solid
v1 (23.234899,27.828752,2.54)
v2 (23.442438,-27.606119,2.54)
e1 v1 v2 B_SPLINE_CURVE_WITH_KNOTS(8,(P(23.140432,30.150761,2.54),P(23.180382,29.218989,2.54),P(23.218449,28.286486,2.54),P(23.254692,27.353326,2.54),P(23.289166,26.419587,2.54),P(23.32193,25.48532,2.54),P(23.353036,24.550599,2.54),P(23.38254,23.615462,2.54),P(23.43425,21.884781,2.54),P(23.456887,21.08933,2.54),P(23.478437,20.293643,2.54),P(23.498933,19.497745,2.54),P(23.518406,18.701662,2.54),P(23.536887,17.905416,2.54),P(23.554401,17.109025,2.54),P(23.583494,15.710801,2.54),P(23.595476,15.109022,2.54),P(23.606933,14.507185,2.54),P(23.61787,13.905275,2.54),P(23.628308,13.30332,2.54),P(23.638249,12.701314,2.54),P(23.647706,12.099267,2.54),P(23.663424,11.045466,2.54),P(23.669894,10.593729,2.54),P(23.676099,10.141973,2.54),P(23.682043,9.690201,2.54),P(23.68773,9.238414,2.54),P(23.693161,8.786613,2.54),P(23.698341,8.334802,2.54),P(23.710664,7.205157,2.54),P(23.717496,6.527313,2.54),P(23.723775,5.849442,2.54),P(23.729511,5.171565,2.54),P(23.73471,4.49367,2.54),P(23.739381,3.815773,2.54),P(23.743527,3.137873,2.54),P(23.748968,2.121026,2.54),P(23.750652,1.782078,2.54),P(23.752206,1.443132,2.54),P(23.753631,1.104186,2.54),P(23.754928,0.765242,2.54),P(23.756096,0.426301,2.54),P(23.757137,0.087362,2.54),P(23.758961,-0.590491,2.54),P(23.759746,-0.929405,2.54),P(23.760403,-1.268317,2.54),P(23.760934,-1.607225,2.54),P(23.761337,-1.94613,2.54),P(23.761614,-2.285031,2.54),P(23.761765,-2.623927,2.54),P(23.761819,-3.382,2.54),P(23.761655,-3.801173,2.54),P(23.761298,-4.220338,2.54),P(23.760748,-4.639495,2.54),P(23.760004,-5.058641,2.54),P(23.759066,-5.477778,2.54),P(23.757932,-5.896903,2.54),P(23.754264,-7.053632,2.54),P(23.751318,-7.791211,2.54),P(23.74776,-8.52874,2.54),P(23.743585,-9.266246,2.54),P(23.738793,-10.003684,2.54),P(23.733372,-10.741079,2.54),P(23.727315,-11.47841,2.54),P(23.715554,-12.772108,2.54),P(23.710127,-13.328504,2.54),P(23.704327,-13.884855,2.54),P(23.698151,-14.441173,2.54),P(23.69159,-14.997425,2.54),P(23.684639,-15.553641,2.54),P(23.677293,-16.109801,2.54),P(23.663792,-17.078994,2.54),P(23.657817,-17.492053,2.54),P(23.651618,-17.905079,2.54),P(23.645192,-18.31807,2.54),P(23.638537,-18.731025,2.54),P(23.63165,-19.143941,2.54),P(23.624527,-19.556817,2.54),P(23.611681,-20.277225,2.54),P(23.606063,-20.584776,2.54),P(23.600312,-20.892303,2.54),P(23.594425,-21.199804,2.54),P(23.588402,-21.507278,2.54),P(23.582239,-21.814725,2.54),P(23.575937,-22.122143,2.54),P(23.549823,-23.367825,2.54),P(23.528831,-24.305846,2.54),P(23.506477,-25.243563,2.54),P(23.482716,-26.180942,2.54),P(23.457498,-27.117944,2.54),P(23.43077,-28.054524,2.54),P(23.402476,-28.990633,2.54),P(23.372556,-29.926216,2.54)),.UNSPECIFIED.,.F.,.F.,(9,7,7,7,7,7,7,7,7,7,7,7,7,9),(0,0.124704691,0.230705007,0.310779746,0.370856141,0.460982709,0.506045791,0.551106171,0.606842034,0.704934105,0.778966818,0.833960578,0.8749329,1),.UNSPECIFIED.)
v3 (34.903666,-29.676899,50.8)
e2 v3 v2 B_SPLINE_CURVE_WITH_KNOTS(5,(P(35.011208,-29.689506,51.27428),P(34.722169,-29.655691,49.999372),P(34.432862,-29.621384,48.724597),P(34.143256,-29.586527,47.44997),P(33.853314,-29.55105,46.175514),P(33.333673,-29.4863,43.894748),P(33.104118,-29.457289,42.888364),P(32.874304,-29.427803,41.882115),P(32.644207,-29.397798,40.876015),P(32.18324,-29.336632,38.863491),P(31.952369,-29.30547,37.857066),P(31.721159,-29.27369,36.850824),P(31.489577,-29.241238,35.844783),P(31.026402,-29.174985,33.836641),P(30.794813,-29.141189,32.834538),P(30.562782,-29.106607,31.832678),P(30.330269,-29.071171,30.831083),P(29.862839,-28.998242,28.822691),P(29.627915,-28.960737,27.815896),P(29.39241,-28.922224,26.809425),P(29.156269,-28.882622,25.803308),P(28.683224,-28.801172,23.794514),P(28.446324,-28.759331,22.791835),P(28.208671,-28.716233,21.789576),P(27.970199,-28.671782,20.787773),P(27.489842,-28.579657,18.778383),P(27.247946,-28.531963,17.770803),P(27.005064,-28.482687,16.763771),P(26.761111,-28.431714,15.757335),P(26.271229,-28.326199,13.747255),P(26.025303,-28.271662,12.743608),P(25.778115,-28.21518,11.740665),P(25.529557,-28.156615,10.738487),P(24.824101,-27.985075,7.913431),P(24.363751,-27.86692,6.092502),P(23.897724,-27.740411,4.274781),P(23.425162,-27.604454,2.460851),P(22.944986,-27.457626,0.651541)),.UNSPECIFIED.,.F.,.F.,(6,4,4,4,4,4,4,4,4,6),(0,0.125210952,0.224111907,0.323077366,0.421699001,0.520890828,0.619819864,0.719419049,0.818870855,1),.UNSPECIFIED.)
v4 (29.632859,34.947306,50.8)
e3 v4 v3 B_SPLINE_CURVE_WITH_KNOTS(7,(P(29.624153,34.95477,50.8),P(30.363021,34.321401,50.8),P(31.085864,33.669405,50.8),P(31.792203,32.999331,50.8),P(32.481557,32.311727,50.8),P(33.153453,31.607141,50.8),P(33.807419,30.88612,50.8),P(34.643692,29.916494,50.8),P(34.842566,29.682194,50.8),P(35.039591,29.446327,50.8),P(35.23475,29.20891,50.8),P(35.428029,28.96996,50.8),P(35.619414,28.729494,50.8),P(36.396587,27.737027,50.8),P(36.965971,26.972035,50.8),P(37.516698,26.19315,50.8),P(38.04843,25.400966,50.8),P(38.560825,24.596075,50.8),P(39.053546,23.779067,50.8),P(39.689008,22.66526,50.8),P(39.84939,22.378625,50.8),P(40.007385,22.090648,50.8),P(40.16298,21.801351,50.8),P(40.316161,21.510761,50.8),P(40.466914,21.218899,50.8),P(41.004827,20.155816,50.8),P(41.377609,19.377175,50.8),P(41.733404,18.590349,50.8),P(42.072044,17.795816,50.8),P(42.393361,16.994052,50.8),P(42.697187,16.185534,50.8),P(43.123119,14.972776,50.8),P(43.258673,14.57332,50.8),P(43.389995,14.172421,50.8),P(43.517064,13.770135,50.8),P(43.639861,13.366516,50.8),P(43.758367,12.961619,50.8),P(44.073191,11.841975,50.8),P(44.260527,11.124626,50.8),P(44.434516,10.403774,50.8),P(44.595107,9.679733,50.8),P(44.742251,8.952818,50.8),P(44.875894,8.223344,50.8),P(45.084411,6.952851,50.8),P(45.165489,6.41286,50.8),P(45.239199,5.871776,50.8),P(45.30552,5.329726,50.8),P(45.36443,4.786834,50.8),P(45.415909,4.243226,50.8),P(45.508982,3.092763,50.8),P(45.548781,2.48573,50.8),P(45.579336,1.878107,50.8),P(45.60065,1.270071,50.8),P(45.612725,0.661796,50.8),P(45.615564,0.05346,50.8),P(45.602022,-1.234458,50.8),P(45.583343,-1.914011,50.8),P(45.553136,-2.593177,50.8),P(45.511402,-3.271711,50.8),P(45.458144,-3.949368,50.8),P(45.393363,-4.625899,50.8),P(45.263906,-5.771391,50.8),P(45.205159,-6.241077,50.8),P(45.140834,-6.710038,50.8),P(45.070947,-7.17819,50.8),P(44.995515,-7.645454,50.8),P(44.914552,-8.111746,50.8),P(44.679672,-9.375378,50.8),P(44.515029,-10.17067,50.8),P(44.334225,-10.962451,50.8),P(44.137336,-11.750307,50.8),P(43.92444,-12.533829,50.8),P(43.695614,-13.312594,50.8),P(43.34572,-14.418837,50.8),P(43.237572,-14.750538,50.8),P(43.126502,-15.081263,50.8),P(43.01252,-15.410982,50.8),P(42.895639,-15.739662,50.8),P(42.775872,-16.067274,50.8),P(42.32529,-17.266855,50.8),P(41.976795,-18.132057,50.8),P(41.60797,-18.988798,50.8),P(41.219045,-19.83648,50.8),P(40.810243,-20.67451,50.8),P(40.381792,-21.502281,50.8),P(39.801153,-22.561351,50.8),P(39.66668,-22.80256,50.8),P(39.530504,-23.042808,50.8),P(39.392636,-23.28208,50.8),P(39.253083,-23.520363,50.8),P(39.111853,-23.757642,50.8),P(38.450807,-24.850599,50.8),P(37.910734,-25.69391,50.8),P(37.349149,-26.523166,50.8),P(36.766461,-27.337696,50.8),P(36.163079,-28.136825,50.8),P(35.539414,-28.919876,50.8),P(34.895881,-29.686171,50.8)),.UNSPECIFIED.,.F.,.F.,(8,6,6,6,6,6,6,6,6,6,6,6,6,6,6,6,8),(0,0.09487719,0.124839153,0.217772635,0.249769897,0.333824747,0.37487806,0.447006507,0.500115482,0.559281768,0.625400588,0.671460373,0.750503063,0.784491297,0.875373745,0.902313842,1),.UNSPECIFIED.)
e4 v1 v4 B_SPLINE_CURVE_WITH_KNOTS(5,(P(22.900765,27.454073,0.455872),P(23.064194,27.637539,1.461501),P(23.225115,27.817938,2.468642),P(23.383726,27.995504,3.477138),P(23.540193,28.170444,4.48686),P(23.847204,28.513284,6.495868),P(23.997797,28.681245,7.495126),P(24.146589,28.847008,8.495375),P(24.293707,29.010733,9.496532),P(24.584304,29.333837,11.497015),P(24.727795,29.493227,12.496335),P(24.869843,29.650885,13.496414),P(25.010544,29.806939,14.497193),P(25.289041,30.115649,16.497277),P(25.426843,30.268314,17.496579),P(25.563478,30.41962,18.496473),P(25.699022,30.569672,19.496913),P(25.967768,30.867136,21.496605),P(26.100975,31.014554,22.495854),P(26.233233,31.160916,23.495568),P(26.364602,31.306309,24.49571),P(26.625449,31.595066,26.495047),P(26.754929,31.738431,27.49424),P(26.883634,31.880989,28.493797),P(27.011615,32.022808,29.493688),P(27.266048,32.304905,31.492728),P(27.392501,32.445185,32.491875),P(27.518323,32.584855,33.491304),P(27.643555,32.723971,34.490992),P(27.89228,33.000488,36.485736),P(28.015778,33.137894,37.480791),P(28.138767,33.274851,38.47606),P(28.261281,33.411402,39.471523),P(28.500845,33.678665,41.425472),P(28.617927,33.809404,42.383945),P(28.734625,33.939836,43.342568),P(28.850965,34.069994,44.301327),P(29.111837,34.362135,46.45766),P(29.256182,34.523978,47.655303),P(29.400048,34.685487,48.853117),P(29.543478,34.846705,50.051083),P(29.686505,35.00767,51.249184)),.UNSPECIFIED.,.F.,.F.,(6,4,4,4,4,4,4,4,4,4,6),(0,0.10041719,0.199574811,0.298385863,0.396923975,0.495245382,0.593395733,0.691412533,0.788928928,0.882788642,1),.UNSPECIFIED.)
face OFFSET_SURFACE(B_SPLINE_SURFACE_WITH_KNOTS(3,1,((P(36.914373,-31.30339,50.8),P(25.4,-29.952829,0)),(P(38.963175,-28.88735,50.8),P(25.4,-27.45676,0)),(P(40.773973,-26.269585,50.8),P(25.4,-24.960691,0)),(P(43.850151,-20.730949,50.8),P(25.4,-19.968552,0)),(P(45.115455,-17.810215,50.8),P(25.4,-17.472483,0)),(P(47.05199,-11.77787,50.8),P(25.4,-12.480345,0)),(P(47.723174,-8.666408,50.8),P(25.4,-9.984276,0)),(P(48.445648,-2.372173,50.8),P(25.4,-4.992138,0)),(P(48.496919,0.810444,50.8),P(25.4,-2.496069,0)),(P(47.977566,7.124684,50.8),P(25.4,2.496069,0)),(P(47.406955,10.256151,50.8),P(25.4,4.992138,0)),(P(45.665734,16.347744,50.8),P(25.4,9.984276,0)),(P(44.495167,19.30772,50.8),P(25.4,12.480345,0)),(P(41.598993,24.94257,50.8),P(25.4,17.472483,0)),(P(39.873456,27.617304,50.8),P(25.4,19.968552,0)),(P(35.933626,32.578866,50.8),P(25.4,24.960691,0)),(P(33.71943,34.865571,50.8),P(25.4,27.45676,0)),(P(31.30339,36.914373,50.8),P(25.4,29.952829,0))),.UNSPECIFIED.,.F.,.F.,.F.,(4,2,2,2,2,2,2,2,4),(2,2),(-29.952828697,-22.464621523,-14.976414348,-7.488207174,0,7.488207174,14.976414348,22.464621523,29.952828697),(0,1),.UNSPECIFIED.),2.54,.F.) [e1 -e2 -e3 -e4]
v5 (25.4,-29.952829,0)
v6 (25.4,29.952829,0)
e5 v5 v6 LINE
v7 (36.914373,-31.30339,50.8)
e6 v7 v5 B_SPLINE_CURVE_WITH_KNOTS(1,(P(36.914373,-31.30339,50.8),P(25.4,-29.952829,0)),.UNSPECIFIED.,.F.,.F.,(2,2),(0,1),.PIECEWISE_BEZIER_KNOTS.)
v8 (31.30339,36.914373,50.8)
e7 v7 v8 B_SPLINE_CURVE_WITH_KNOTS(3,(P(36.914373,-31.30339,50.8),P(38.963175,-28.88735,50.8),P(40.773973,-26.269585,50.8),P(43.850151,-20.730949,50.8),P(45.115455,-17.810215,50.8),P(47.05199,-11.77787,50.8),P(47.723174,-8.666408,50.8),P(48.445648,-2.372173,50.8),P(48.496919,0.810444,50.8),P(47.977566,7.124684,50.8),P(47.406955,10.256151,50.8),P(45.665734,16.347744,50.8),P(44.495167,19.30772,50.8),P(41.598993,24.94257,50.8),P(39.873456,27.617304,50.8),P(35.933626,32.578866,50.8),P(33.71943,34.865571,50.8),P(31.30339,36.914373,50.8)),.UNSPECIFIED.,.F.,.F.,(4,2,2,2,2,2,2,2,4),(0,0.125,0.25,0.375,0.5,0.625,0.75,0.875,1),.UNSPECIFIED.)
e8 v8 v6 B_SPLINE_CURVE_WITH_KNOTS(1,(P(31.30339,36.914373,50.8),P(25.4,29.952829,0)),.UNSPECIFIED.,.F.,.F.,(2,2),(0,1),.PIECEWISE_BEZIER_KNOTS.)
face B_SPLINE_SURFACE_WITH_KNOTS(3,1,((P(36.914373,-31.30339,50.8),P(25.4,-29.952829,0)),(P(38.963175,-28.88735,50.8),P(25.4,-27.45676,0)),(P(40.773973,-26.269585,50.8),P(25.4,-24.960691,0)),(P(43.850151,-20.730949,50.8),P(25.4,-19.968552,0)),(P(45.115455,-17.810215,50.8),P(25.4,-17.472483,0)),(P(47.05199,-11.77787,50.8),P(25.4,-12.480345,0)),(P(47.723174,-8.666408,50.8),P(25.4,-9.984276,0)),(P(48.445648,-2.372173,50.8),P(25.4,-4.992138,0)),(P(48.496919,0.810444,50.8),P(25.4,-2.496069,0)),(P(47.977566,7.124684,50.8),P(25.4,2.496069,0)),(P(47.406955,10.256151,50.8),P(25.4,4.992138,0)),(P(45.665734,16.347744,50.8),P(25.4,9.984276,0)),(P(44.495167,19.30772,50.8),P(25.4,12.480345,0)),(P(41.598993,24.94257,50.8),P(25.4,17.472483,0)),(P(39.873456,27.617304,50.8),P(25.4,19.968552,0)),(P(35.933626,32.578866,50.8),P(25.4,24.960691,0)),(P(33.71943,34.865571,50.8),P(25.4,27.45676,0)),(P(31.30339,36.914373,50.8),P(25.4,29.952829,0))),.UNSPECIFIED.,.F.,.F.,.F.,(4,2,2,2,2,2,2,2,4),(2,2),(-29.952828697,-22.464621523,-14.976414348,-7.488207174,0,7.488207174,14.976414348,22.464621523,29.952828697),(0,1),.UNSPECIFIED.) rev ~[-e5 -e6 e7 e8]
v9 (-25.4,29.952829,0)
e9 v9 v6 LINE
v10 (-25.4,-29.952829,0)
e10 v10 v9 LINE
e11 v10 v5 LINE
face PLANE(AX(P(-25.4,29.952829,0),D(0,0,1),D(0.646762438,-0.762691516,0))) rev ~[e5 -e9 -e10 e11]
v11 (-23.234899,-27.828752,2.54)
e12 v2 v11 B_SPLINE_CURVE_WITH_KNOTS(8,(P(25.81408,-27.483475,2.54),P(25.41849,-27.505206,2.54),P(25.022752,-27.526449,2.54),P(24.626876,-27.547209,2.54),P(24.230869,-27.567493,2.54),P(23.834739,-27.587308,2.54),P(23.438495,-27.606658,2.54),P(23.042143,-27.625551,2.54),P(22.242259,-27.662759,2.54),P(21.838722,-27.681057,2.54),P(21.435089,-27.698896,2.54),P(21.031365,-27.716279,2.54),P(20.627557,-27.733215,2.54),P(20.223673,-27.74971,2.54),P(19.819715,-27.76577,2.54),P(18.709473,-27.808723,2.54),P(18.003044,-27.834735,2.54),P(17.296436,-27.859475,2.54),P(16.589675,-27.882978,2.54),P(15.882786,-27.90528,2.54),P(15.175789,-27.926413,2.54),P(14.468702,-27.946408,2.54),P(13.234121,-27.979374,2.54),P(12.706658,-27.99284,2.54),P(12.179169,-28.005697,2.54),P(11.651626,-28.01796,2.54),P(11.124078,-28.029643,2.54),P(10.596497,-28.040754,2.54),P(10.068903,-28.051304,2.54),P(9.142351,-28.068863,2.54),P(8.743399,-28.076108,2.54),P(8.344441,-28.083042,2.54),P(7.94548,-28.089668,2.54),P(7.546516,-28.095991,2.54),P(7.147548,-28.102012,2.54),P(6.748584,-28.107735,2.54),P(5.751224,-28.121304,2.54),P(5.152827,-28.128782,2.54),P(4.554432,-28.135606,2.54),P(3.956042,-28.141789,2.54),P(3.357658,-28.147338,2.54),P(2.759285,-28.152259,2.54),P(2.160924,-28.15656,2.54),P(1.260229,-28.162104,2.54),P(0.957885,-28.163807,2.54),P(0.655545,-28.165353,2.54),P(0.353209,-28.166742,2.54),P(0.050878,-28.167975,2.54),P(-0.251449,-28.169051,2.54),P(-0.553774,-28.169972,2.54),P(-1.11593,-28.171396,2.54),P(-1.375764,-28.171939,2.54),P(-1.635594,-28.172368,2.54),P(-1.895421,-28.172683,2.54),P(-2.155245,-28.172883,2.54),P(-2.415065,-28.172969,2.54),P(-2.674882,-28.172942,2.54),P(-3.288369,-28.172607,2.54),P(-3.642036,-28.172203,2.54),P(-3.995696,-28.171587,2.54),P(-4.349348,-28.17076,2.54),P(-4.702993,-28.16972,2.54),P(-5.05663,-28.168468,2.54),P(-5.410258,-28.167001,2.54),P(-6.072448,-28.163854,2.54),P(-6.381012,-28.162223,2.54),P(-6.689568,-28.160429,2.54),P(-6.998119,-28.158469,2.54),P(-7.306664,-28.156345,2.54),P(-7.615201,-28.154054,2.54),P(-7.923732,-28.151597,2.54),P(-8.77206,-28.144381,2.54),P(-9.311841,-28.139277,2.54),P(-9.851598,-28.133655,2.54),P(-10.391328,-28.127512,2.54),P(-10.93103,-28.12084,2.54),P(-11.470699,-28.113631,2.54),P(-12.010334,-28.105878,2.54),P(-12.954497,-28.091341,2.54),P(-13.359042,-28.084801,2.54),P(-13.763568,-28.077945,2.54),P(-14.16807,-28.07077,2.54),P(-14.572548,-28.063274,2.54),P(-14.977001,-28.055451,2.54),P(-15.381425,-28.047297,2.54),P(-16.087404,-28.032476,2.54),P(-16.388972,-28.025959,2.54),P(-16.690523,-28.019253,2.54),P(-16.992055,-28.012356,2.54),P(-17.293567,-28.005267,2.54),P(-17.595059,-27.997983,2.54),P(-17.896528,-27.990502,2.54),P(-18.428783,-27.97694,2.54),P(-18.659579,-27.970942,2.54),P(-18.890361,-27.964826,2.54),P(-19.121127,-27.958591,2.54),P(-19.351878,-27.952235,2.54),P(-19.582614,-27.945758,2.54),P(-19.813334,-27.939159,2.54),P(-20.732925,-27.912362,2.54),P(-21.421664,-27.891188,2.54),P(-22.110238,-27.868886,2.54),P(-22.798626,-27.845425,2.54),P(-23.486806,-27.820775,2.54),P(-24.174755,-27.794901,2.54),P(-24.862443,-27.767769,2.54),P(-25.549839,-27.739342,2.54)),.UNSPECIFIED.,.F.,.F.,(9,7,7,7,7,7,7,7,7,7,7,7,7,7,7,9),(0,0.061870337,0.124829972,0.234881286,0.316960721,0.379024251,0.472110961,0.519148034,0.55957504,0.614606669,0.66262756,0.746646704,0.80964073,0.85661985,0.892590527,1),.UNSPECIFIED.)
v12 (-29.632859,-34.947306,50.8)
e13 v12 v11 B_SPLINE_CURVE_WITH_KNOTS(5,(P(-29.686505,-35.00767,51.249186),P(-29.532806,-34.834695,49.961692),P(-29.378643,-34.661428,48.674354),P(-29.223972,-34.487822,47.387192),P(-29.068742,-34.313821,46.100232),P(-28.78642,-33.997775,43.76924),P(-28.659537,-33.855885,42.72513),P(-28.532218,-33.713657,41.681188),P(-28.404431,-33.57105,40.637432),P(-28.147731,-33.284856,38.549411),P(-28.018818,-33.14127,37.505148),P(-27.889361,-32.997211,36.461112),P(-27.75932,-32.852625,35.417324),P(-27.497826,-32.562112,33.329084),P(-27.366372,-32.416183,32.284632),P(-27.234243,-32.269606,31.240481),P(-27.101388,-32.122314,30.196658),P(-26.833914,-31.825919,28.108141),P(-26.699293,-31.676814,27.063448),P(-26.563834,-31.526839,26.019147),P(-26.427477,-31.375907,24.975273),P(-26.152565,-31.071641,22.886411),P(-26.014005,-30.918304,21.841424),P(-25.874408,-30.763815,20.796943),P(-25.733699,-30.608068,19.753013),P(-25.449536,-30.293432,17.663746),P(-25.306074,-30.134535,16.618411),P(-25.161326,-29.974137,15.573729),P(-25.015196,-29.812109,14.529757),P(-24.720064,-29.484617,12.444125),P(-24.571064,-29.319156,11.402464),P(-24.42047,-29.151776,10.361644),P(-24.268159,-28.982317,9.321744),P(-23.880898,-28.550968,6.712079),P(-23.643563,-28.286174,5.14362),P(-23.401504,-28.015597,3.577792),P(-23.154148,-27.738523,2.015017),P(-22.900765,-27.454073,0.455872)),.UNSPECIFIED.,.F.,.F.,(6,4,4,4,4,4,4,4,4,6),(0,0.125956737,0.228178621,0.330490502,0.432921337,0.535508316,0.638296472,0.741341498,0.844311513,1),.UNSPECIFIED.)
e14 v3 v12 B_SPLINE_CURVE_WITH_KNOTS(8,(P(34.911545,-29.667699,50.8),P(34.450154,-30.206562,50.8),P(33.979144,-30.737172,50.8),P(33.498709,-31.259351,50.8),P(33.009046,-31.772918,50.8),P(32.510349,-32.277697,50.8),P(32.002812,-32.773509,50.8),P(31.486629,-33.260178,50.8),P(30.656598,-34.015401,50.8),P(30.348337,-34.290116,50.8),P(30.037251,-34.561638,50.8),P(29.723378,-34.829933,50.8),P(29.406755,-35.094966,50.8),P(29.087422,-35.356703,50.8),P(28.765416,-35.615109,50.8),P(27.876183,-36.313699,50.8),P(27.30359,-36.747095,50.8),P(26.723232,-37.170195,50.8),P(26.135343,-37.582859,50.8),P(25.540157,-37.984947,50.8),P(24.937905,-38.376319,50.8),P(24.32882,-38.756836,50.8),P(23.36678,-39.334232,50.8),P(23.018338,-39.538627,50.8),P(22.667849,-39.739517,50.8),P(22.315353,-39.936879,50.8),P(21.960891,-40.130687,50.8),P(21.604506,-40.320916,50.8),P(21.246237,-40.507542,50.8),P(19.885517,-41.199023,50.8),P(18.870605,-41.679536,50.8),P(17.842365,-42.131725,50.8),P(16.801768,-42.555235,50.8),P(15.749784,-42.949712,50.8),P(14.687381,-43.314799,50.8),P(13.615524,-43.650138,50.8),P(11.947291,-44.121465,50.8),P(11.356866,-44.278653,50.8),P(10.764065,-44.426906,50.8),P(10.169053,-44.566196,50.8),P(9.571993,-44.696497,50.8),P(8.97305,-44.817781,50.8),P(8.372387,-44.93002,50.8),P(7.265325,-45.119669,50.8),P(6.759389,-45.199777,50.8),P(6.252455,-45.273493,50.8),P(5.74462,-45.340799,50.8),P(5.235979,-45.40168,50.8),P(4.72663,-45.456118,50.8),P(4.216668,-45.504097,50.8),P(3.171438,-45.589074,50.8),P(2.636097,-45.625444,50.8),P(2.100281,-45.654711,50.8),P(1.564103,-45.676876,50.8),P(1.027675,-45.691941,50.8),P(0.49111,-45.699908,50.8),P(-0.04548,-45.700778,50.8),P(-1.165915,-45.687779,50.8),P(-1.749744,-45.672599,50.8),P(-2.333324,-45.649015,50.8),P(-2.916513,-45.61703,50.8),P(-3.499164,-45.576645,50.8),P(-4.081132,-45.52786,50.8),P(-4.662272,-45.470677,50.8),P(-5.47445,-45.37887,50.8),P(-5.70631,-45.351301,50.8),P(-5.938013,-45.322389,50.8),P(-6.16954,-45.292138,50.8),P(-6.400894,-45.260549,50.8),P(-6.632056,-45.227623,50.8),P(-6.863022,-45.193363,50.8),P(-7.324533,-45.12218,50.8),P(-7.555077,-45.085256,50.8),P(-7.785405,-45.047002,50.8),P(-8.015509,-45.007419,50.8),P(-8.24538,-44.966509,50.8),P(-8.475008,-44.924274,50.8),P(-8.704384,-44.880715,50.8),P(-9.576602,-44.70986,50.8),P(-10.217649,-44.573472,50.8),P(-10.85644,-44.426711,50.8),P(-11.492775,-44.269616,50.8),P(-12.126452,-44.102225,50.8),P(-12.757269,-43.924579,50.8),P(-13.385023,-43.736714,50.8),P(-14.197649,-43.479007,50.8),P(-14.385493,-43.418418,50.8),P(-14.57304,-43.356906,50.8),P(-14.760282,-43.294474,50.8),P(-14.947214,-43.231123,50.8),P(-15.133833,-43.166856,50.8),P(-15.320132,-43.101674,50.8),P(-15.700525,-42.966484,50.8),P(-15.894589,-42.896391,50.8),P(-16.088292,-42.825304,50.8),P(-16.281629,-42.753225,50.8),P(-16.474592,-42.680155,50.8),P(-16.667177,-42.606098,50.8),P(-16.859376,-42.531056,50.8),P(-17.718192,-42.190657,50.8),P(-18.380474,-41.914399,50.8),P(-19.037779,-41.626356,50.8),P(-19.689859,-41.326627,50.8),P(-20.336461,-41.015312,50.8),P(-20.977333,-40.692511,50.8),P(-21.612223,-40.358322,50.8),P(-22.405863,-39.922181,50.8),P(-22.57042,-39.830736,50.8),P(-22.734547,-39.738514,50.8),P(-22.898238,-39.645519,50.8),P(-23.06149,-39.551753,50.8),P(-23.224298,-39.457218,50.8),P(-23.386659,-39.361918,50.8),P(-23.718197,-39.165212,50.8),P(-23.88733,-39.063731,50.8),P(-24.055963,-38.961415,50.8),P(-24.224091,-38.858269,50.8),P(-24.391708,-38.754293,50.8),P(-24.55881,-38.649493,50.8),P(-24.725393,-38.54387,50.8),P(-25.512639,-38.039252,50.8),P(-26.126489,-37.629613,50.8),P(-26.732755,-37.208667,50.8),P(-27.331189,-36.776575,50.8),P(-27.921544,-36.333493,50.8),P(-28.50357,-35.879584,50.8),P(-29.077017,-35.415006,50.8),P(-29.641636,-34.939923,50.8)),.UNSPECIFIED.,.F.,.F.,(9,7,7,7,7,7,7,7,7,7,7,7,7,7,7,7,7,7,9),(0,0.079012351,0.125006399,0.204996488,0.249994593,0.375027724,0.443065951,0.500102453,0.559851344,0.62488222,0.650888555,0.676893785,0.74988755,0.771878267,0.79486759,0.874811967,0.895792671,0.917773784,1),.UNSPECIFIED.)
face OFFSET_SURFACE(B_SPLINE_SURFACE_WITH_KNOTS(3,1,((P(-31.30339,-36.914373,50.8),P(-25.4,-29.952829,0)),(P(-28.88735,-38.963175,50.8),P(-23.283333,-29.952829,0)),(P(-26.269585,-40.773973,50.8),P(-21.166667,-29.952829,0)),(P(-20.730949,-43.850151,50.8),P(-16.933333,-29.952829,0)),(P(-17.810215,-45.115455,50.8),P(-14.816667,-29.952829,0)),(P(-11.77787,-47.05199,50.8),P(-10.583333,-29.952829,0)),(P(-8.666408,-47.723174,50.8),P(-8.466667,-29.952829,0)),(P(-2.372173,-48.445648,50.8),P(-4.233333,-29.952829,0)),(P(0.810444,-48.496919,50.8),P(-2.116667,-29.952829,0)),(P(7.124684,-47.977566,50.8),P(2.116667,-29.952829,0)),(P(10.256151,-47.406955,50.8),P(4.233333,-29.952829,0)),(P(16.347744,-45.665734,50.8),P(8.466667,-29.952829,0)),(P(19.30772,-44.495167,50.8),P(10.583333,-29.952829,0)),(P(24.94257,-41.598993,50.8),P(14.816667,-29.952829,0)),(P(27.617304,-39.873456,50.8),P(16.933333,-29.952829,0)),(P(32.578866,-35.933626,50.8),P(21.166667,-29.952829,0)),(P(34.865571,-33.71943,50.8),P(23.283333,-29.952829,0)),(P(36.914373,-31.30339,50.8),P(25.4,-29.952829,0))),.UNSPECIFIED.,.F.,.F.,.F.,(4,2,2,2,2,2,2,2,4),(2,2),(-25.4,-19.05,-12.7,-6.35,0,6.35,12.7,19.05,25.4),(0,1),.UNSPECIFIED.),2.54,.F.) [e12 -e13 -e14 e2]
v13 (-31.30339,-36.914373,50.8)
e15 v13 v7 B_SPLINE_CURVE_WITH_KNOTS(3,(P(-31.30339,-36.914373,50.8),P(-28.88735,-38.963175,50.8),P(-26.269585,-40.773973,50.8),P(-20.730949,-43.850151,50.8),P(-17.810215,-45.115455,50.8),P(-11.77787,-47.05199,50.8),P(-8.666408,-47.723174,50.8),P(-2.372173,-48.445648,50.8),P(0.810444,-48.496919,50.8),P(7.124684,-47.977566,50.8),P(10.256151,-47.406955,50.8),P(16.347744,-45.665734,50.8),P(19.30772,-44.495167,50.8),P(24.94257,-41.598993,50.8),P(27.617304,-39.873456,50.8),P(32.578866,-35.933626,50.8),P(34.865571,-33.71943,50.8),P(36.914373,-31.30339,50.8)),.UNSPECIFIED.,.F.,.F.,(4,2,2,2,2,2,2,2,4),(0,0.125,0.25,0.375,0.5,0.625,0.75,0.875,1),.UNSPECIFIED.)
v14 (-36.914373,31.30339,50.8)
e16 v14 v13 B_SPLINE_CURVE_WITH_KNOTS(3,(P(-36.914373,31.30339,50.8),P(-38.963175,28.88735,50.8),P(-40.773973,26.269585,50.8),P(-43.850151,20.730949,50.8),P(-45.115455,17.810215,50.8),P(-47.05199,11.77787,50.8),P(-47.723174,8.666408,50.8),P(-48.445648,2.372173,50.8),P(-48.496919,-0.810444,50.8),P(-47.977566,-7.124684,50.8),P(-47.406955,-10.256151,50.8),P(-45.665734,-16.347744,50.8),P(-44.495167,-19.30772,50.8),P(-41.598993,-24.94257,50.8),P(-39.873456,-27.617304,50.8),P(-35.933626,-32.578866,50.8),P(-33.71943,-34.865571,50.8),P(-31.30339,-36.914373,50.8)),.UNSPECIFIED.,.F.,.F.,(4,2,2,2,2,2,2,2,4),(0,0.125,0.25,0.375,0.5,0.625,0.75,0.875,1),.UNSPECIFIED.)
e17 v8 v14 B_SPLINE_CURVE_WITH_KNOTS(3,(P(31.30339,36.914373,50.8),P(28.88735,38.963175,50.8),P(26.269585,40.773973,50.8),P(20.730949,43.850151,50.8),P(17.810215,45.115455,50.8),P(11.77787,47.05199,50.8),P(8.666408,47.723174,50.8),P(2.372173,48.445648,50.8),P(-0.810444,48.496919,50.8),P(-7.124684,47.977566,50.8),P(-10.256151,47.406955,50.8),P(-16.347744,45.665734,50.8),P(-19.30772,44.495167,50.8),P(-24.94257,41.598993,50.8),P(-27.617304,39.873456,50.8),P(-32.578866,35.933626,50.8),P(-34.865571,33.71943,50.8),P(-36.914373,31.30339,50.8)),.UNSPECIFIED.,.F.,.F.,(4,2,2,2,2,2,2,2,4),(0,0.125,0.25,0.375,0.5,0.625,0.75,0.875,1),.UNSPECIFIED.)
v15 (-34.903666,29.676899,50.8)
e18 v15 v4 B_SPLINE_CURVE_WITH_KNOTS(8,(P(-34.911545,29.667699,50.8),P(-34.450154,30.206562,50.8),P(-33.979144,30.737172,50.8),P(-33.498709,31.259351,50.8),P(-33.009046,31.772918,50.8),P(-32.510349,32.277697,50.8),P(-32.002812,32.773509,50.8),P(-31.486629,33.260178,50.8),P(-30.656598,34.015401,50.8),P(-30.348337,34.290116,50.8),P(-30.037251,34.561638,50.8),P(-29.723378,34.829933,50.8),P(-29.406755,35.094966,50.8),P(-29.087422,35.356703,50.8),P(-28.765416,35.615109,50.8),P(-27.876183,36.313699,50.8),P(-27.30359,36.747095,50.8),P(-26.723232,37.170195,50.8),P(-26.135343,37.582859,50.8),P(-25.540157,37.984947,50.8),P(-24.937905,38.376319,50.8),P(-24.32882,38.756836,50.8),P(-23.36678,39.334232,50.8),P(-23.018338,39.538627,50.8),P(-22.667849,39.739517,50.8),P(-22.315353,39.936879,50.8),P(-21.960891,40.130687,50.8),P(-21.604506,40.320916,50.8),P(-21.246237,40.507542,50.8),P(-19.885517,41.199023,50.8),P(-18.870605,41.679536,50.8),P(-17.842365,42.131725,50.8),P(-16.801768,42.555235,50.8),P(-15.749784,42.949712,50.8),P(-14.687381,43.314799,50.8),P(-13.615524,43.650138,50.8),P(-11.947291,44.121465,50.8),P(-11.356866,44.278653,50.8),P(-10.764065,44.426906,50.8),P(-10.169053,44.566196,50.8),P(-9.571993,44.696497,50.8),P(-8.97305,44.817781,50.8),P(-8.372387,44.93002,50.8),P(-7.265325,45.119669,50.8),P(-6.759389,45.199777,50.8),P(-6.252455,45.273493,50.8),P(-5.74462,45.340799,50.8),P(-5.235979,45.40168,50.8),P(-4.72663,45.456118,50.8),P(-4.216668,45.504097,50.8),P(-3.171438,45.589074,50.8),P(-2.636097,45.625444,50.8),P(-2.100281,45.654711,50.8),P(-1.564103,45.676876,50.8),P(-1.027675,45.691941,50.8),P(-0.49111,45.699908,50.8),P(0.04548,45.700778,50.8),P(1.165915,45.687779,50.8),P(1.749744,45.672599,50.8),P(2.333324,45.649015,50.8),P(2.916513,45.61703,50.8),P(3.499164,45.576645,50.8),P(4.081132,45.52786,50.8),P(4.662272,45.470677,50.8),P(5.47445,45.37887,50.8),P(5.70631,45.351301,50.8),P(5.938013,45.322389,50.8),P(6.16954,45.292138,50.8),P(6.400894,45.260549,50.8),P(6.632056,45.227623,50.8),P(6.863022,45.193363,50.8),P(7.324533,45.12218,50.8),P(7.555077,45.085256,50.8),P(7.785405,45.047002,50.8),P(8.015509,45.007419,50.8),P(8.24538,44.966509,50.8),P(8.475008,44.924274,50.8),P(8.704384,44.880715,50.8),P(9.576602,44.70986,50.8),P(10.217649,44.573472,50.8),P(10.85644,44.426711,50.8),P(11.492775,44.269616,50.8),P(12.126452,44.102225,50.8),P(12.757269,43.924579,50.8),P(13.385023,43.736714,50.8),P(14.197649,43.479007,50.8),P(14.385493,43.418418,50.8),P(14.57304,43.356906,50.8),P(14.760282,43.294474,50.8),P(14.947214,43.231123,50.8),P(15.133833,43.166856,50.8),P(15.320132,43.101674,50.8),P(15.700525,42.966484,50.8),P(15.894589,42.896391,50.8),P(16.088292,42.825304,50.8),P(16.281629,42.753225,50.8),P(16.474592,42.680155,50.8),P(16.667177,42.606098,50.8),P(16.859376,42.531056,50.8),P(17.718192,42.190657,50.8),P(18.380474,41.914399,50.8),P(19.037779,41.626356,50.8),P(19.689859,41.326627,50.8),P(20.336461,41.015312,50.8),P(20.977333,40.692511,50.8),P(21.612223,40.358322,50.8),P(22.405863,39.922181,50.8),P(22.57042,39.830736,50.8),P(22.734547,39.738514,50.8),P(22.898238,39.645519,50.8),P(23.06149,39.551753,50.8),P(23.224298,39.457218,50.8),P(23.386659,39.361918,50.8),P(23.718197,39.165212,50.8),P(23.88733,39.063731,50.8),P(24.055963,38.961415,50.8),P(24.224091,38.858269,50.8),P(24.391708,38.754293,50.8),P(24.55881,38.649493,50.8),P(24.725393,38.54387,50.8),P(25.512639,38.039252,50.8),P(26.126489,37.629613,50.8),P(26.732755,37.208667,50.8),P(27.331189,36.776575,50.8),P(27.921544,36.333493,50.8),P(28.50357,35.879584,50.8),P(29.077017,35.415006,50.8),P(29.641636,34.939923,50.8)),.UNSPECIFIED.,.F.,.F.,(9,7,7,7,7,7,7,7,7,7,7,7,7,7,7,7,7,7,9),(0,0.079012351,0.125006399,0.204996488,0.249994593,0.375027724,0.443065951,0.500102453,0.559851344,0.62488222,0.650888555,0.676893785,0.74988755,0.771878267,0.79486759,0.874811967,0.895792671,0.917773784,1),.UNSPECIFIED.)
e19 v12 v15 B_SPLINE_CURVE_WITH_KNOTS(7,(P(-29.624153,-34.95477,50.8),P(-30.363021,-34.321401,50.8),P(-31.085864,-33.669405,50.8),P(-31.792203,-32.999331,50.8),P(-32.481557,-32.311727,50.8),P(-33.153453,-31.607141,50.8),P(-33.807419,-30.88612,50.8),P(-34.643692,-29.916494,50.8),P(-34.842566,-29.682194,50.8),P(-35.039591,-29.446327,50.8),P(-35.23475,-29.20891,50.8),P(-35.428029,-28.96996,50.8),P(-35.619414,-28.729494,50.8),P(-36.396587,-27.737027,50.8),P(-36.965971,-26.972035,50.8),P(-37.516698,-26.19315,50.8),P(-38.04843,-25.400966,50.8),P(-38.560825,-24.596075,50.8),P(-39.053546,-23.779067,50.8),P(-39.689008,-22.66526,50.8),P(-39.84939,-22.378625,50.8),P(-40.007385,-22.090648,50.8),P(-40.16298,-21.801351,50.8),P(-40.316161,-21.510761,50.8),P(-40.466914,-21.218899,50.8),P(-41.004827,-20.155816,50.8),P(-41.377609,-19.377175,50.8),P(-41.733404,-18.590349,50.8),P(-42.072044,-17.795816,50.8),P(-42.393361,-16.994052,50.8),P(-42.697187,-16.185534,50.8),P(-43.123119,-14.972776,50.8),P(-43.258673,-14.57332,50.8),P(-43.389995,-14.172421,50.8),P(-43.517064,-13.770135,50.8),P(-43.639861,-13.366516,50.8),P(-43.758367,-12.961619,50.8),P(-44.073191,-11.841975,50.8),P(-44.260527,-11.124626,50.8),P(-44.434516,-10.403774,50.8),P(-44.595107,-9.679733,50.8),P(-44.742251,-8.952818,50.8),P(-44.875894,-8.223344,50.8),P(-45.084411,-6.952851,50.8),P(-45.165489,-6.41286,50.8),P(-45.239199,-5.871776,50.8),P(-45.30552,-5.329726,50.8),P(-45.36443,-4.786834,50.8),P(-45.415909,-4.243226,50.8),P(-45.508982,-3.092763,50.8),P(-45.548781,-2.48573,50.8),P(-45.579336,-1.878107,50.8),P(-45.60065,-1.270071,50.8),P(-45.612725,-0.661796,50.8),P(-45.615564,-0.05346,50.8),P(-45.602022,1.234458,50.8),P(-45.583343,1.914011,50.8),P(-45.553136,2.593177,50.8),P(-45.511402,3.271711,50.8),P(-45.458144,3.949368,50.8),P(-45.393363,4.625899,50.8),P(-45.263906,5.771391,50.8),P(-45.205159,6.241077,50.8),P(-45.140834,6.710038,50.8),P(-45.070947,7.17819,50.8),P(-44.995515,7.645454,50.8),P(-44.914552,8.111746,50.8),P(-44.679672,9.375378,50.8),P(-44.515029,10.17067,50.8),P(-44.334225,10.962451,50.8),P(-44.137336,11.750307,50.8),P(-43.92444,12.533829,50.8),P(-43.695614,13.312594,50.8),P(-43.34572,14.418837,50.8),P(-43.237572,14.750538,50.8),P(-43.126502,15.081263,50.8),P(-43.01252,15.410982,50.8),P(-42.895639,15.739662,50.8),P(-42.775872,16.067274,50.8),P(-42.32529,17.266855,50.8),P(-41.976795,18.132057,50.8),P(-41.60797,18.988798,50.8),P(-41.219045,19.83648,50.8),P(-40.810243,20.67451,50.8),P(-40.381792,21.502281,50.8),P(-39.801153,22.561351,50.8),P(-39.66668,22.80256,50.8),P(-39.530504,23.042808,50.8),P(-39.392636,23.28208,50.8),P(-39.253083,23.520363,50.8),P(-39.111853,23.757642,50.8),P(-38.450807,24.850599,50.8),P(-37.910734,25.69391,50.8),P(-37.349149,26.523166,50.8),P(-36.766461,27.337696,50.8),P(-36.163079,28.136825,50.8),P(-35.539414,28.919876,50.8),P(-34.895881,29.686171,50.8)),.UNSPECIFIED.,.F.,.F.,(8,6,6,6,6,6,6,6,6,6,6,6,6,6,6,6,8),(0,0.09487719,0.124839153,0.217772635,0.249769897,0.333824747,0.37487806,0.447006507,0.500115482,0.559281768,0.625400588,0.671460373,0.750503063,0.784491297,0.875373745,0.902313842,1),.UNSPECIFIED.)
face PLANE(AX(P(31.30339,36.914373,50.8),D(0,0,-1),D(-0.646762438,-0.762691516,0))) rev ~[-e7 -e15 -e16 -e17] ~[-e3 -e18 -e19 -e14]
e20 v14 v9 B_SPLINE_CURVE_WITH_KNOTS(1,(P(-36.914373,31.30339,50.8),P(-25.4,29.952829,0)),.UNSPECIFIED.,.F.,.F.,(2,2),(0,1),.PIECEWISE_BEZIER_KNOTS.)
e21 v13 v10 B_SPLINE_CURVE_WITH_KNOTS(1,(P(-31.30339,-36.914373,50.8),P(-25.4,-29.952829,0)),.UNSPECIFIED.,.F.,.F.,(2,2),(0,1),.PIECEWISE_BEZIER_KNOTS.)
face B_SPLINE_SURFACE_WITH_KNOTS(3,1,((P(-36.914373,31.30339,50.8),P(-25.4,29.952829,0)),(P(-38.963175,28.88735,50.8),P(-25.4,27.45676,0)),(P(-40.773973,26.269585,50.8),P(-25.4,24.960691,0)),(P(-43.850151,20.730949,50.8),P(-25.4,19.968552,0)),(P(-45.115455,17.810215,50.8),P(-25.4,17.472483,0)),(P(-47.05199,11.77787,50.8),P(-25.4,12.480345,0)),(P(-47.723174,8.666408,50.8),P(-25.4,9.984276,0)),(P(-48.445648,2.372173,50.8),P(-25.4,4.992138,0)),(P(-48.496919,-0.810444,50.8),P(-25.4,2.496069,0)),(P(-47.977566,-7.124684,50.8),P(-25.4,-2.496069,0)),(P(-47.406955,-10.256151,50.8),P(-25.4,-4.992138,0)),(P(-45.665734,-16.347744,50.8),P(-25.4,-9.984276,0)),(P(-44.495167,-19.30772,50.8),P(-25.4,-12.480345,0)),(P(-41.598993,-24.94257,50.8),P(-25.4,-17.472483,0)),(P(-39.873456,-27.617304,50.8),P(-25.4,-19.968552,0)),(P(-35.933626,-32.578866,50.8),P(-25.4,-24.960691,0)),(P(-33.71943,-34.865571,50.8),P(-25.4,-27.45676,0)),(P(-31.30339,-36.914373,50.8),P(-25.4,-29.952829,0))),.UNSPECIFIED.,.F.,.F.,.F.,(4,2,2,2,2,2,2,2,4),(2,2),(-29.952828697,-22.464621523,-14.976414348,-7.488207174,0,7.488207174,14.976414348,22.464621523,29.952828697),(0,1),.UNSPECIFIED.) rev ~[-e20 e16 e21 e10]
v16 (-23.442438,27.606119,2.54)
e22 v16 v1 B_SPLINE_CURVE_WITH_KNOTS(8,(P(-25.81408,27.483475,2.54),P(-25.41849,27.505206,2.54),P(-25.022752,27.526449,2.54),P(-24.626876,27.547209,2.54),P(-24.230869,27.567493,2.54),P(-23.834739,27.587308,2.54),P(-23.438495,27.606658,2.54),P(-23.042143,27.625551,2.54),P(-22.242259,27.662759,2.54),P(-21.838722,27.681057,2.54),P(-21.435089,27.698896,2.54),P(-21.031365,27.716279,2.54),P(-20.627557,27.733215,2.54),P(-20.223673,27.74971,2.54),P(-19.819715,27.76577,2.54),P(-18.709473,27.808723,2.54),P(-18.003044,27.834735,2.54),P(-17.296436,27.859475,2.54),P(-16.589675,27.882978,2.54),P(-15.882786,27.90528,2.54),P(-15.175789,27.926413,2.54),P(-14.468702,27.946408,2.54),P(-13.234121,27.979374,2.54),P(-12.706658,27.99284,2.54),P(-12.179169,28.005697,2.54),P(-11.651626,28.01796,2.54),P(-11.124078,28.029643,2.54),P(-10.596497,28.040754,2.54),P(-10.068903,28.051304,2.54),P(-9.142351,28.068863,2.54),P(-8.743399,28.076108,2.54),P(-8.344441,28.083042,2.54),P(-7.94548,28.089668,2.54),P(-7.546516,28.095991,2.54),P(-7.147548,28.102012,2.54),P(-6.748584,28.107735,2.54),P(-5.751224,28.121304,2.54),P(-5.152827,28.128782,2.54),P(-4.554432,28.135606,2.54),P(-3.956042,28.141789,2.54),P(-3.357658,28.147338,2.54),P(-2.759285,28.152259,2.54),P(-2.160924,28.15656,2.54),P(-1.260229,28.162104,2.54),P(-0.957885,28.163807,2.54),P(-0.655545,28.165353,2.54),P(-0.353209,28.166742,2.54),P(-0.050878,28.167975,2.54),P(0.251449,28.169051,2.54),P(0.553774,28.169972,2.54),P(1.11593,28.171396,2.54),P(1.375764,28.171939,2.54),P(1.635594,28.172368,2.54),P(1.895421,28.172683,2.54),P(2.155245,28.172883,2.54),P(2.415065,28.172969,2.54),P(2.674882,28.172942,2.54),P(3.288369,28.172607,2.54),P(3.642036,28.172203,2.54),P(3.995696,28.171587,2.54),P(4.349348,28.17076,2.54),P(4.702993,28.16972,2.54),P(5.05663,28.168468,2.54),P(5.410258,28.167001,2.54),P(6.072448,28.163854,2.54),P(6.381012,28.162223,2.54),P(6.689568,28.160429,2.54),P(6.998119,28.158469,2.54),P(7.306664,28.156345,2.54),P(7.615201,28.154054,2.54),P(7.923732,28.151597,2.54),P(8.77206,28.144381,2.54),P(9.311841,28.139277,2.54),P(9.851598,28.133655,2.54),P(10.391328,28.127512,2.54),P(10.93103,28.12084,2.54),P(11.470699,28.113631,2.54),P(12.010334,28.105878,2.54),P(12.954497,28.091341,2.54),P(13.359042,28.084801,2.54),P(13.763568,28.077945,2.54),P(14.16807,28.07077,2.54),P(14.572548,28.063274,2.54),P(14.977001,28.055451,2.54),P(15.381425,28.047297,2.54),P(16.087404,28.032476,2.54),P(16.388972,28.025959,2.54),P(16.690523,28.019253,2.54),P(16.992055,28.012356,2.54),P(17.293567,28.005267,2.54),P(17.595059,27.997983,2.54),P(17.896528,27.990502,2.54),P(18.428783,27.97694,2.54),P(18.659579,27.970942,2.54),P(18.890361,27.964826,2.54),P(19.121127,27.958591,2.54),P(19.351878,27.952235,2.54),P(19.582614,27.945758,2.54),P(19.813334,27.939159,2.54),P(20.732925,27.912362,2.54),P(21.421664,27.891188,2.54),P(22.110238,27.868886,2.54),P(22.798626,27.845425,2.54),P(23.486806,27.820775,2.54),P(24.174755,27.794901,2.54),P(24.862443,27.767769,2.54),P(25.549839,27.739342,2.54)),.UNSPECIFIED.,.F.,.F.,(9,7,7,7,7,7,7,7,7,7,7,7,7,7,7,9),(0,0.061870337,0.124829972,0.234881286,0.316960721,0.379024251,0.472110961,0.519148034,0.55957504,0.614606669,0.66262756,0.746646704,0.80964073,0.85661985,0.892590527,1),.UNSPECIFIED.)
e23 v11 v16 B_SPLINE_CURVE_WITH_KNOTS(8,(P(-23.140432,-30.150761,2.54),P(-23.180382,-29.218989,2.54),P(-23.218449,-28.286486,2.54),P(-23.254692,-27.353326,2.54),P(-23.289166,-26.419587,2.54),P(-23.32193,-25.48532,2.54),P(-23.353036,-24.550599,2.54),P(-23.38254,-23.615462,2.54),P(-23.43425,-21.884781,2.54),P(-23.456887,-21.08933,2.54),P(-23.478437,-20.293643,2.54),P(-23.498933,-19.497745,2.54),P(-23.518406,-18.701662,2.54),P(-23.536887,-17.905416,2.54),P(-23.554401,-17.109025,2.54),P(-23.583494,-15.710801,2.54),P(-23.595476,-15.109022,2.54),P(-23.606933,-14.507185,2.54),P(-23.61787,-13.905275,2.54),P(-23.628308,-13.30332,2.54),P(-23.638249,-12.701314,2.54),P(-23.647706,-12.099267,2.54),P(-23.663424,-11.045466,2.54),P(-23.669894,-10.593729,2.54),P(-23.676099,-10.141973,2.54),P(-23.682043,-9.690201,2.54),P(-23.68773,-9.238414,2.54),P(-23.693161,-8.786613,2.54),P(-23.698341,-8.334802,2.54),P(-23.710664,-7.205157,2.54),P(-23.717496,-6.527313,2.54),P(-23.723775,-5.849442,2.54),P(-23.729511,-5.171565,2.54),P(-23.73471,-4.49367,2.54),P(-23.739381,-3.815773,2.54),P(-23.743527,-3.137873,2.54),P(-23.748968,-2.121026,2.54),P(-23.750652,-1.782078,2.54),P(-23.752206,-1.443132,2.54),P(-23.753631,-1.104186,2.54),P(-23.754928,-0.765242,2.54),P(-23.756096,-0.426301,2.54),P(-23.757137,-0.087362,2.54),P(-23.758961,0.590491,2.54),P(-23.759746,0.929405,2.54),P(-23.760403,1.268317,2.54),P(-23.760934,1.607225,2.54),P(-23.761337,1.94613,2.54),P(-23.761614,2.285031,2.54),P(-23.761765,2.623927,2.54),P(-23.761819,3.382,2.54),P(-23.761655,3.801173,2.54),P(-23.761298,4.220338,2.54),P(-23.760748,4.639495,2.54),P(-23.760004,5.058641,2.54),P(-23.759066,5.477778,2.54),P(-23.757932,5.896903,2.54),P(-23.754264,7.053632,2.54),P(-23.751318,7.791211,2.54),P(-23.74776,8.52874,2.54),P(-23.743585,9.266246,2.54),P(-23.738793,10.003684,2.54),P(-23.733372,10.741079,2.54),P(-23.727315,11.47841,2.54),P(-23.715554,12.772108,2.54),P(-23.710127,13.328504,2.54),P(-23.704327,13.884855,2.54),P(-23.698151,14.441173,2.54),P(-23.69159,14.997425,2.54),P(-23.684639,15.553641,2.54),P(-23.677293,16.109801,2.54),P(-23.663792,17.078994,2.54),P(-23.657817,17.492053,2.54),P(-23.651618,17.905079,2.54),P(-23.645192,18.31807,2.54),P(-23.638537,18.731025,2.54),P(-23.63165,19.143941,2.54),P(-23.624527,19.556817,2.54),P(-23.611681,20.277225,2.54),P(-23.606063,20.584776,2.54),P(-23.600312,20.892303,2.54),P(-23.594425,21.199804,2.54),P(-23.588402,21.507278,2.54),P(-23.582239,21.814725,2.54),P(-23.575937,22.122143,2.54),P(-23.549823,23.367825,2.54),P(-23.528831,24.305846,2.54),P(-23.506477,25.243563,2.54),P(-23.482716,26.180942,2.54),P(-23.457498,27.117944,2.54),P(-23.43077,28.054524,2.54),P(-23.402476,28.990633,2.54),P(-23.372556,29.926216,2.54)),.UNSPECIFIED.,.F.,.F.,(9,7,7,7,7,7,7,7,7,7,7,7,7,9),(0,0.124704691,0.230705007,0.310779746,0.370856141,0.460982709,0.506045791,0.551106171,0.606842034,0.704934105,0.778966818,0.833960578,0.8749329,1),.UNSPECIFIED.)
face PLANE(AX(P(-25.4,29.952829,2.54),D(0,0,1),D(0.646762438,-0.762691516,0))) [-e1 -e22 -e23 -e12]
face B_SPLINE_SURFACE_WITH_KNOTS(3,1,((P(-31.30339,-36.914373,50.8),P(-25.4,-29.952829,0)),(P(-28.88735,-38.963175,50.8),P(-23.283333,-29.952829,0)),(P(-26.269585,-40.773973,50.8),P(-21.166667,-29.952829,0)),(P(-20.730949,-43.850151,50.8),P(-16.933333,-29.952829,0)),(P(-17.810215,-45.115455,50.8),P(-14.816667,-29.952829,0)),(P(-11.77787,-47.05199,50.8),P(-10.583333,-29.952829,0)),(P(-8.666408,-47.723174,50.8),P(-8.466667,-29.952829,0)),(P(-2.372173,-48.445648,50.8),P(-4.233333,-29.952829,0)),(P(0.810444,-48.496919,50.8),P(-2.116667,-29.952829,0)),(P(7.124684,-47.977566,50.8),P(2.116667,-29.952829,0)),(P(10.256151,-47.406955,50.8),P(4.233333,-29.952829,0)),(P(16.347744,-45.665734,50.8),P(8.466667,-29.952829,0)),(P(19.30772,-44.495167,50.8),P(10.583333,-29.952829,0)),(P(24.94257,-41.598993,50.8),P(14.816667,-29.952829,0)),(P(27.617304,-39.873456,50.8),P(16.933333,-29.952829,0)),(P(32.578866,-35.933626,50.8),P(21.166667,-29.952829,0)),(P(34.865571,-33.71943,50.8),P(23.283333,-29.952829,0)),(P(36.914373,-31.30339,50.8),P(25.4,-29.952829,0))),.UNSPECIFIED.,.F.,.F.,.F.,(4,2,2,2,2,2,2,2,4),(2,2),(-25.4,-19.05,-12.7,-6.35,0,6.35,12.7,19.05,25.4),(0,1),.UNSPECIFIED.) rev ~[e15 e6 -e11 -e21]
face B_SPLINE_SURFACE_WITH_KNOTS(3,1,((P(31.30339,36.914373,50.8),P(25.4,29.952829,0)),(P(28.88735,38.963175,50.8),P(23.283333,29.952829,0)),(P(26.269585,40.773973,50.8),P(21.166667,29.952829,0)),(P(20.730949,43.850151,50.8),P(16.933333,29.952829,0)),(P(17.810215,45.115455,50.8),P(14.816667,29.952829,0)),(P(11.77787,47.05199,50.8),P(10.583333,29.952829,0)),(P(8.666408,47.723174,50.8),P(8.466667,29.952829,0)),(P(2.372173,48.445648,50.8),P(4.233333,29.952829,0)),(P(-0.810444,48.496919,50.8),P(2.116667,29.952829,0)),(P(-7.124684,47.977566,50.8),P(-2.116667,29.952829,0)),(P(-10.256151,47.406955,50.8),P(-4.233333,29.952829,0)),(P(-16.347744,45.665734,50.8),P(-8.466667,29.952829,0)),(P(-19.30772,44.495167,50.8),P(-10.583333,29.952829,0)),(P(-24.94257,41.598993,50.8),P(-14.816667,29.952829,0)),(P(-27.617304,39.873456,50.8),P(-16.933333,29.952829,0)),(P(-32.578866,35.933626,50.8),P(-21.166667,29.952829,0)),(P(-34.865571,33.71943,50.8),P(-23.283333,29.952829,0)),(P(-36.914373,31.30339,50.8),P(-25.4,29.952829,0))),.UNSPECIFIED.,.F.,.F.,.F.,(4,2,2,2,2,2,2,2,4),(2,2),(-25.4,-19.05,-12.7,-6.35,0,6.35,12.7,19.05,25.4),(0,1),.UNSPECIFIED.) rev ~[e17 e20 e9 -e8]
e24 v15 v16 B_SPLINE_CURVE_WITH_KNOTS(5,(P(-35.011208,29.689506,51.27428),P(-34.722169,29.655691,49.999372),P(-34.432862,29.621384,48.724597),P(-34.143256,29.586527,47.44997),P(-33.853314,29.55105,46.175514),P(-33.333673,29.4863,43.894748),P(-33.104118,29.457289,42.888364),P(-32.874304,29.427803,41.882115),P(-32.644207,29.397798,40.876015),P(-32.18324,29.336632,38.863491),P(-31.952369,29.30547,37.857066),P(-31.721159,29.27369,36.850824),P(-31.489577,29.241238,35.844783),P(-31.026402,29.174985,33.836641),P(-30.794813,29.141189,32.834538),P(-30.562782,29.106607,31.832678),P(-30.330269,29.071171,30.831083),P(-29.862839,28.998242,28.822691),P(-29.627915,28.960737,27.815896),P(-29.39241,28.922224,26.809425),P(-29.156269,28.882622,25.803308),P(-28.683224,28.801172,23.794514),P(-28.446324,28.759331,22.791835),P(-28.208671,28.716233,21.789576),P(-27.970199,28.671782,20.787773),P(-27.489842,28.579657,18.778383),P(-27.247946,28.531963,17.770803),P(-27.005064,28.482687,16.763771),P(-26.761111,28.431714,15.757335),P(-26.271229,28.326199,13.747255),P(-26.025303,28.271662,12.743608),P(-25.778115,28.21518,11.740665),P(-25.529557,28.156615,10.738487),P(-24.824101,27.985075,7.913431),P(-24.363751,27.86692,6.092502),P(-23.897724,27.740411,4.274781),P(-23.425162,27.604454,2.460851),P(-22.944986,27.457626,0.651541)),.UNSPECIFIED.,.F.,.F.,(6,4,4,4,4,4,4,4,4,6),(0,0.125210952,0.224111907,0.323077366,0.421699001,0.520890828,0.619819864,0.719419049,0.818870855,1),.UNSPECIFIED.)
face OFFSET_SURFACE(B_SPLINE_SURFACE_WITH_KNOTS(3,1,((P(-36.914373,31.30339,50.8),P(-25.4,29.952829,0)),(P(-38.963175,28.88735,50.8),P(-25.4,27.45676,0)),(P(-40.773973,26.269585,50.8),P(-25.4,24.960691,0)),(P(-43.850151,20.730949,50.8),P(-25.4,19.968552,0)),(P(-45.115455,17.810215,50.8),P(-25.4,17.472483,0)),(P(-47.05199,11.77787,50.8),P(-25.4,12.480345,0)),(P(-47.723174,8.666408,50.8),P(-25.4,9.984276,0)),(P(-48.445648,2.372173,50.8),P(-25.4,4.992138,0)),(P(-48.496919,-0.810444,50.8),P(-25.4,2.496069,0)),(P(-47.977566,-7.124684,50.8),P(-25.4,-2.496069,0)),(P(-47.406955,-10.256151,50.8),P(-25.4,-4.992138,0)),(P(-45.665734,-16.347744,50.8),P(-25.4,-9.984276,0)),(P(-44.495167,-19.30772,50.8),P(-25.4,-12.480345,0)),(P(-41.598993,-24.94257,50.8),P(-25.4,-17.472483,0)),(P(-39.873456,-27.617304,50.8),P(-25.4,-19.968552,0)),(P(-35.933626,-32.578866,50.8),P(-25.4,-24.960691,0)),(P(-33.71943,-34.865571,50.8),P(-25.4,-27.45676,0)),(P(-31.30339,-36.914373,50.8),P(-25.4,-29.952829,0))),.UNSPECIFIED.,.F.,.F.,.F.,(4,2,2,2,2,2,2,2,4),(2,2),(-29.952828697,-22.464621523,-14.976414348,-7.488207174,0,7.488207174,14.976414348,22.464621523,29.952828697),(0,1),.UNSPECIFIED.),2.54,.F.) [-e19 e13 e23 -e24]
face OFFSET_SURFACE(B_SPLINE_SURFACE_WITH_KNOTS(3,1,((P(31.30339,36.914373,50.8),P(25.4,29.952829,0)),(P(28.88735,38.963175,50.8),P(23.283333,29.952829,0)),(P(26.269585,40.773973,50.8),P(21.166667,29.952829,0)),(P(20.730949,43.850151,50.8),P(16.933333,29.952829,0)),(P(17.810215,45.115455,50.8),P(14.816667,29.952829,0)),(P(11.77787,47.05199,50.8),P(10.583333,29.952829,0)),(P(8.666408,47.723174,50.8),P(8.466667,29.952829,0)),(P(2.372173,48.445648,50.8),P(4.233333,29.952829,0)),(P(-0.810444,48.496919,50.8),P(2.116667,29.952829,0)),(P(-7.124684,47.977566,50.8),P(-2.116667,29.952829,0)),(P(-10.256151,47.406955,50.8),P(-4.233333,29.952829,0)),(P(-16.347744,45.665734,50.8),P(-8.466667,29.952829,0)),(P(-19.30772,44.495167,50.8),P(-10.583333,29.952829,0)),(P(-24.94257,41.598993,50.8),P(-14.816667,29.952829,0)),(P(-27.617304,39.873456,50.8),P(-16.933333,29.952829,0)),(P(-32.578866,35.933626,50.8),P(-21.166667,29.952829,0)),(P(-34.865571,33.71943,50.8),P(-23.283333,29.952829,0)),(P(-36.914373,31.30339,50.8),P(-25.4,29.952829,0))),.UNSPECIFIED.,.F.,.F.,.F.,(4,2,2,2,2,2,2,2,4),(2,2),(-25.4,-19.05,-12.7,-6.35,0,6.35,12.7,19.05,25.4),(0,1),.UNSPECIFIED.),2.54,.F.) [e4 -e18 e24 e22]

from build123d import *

# Parameters (mm, degrees)
F0_W = 50.8
F0_H = 59.9056573934
F4_T = 2.54


# Not quite as in the source:
# - the arcs of a loft's sections are written as splines that run evenly, so that the points pair up as in the source's solid
# - a shell that OpenCascade refuses in one call is made with other operations: the cavity is built on its own and cut out


with BuildPart() as f3:
    # F2 (on offset) → F3 section 0
    with BuildSketch(Plane.XY.offset(50.8)):
        with BuildLine():
            add(Edge.make_bspline(
                [(31.3033898449, 36.9143729784), (28.8873497832, 38.9631750527), (26.269585061, 40.7739731742), (20.7309490894, 43.8501509409), (17.8102147937, 45.1154545216), (11.7778696482, 47.0519901199), (8.66640796, 47.7231742528), (2.3721732815, 48.4456477056), (-0.8104440715, 48.4969191609), (-7.1246843741, 47.9775662186), (-10.2561511918, 47.406954663), (-16.3477444048, 45.6657337679), (-19.3077201735, 44.4951674836), (-24.9425697859, 41.5989927782), (-27.6173042968, 39.8734559709), (-32.5788661981, 35.9336258251), (-34.865570904, 33.7194299066), (-36.9143729784, 31.3033898449)],
                knots=[0, 0, 0, 0, 0.125, 0.125, 0.25, 0.25, 0.375, 0.375, 0.5, 0.5, 0.625, 0.625, 0.75, 0.75, 0.875, 0.875, 1, 1, 1, 1], degree=3))
            add(Edge.make_bspline(
                [(-36.9143729784, 31.3033898449), (-38.9631750527, 28.8873497832), (-40.7739731742, 26.269585061), (-43.8501509409, 20.7309490894), (-45.1154545216, 17.8102147937), (-47.0519901199, 11.7778696482), (-47.7231742528, 8.66640796), (-48.4456477056, 2.3721732815), (-48.4969191609, -0.8104440715), (-47.9775662186, -7.1246843741), (-47.406954663, -10.2561511918), (-45.6657337679, -16.3477444048), (-44.4951674836, -19.3077201735), (-41.5989927782, -24.9425697859), (-39.8734559709, -27.6173042968), (-35.9336258251, -32.5788661981), (-33.7194299066, -34.865570904), (-31.3033898449, -36.9143729784)],
                knots=[0, 0, 0, 0, 0.125, 0.125, 0.25, 0.25, 0.375, 0.375, 0.5, 0.5, 0.625, 0.625, 0.75, 0.75, 0.875, 0.875, 1, 1, 1, 1], degree=3))
            add(Edge.make_bspline(
                [(-31.3033898449, -36.9143729784), (-28.8873497832, -38.9631750527), (-26.269585061, -40.7739731742), (-20.7309490894, -43.8501509409), (-17.8102147937, -45.1154545216), (-11.7778696482, -47.0519901199), (-8.66640796, -47.7231742528), (-2.3721732815, -48.4456477056), (0.8104440715, -48.4969191609), (7.1246843741, -47.9775662186), (10.2561511918, -47.406954663), (16.3477444048, -45.6657337679), (19.3077201735, -44.4951674836), (24.9425697859, -41.5989927782), (27.6173042968, -39.8734559709), (32.5788661981, -35.9336258251), (34.865570904, -33.7194299066), (36.9143729784, -31.3033898449)],
                knots=[0, 0, 0, 0, 0.125, 0.125, 0.25, 0.25, 0.375, 0.375, 0.5, 0.5, 0.625, 0.625, 0.75, 0.75, 0.875, 0.875, 1, 1, 1, 1], degree=3))
            add(Edge.make_bspline(
                [(36.9143729784, -31.3033898449), (38.9631750527, -28.8873497832), (40.7739731742, -26.269585061), (43.8501509409, -20.7309490894), (45.1154545216, -17.8102147937), (47.0519901199, -11.7778696482), (47.7231742528, -8.66640796), (48.4456477056, -2.3721732815), (48.4969191609, 0.8104440715), (47.9775662186, 7.1246843741), (47.406954663, 10.2561511918), (45.6657337679, 16.3477444048), (44.4951674836, 19.3077201735), (41.5989927782, 24.9425697859), (39.8734559709, 27.6173042968), (35.9336258251, 32.5788661981), (33.7194299066, 34.865570904), (31.3033898449, 36.9143729784)],
                knots=[0, 0, 0, 0, 0.125, 0.125, 0.25, 0.25, 0.375, 0.375, 0.5, 0.5, 0.625, 0.625, 0.75, 0.75, 0.875, 0.875, 1, 1, 1, 1], degree=3))
        make_face()
    # F0 (on Top) → F3 section 1
    with BuildSketch(Plane.XY):
        Rectangle(F0_W, F0_H)
    loft(ruled=True)

    # F4: shell of thickness 2.54, made by hand


with BuildPart() as f4_core1:
    # F4_t2: copy of F3
    add(f3.part)

    # the walls: a layer under each face that stays
    f4_faces = [f4_core1.faces().sort_by_distance(p)[0] for p in [
        (-1.9837821114, 39.0950356932, 25.4),
        (-36.8186213449, -1.9837821114, 25.4),
        (1.9837821114, -39.0950356932, 25.4),
        (36.8186213449, 1.9837821114, 25.4),
        (0, 0, 0),
    ]]
    thicken(f4_faces, amount=-F4_T, mode=Mode.SUBTRACT)


with BuildPart() as f3_1:
    add(f3.part)

    # what is left inside the walls is the cavity
    f4_cavity = [f4_core1.part.solids().sort_by_distance(p)[0] for p in [
        (11.647477, -9.877061, 50.7746),
    ]]
    add(f4_cavity, mode=Mode.SUBTRACT)


solid = f3_1.part
